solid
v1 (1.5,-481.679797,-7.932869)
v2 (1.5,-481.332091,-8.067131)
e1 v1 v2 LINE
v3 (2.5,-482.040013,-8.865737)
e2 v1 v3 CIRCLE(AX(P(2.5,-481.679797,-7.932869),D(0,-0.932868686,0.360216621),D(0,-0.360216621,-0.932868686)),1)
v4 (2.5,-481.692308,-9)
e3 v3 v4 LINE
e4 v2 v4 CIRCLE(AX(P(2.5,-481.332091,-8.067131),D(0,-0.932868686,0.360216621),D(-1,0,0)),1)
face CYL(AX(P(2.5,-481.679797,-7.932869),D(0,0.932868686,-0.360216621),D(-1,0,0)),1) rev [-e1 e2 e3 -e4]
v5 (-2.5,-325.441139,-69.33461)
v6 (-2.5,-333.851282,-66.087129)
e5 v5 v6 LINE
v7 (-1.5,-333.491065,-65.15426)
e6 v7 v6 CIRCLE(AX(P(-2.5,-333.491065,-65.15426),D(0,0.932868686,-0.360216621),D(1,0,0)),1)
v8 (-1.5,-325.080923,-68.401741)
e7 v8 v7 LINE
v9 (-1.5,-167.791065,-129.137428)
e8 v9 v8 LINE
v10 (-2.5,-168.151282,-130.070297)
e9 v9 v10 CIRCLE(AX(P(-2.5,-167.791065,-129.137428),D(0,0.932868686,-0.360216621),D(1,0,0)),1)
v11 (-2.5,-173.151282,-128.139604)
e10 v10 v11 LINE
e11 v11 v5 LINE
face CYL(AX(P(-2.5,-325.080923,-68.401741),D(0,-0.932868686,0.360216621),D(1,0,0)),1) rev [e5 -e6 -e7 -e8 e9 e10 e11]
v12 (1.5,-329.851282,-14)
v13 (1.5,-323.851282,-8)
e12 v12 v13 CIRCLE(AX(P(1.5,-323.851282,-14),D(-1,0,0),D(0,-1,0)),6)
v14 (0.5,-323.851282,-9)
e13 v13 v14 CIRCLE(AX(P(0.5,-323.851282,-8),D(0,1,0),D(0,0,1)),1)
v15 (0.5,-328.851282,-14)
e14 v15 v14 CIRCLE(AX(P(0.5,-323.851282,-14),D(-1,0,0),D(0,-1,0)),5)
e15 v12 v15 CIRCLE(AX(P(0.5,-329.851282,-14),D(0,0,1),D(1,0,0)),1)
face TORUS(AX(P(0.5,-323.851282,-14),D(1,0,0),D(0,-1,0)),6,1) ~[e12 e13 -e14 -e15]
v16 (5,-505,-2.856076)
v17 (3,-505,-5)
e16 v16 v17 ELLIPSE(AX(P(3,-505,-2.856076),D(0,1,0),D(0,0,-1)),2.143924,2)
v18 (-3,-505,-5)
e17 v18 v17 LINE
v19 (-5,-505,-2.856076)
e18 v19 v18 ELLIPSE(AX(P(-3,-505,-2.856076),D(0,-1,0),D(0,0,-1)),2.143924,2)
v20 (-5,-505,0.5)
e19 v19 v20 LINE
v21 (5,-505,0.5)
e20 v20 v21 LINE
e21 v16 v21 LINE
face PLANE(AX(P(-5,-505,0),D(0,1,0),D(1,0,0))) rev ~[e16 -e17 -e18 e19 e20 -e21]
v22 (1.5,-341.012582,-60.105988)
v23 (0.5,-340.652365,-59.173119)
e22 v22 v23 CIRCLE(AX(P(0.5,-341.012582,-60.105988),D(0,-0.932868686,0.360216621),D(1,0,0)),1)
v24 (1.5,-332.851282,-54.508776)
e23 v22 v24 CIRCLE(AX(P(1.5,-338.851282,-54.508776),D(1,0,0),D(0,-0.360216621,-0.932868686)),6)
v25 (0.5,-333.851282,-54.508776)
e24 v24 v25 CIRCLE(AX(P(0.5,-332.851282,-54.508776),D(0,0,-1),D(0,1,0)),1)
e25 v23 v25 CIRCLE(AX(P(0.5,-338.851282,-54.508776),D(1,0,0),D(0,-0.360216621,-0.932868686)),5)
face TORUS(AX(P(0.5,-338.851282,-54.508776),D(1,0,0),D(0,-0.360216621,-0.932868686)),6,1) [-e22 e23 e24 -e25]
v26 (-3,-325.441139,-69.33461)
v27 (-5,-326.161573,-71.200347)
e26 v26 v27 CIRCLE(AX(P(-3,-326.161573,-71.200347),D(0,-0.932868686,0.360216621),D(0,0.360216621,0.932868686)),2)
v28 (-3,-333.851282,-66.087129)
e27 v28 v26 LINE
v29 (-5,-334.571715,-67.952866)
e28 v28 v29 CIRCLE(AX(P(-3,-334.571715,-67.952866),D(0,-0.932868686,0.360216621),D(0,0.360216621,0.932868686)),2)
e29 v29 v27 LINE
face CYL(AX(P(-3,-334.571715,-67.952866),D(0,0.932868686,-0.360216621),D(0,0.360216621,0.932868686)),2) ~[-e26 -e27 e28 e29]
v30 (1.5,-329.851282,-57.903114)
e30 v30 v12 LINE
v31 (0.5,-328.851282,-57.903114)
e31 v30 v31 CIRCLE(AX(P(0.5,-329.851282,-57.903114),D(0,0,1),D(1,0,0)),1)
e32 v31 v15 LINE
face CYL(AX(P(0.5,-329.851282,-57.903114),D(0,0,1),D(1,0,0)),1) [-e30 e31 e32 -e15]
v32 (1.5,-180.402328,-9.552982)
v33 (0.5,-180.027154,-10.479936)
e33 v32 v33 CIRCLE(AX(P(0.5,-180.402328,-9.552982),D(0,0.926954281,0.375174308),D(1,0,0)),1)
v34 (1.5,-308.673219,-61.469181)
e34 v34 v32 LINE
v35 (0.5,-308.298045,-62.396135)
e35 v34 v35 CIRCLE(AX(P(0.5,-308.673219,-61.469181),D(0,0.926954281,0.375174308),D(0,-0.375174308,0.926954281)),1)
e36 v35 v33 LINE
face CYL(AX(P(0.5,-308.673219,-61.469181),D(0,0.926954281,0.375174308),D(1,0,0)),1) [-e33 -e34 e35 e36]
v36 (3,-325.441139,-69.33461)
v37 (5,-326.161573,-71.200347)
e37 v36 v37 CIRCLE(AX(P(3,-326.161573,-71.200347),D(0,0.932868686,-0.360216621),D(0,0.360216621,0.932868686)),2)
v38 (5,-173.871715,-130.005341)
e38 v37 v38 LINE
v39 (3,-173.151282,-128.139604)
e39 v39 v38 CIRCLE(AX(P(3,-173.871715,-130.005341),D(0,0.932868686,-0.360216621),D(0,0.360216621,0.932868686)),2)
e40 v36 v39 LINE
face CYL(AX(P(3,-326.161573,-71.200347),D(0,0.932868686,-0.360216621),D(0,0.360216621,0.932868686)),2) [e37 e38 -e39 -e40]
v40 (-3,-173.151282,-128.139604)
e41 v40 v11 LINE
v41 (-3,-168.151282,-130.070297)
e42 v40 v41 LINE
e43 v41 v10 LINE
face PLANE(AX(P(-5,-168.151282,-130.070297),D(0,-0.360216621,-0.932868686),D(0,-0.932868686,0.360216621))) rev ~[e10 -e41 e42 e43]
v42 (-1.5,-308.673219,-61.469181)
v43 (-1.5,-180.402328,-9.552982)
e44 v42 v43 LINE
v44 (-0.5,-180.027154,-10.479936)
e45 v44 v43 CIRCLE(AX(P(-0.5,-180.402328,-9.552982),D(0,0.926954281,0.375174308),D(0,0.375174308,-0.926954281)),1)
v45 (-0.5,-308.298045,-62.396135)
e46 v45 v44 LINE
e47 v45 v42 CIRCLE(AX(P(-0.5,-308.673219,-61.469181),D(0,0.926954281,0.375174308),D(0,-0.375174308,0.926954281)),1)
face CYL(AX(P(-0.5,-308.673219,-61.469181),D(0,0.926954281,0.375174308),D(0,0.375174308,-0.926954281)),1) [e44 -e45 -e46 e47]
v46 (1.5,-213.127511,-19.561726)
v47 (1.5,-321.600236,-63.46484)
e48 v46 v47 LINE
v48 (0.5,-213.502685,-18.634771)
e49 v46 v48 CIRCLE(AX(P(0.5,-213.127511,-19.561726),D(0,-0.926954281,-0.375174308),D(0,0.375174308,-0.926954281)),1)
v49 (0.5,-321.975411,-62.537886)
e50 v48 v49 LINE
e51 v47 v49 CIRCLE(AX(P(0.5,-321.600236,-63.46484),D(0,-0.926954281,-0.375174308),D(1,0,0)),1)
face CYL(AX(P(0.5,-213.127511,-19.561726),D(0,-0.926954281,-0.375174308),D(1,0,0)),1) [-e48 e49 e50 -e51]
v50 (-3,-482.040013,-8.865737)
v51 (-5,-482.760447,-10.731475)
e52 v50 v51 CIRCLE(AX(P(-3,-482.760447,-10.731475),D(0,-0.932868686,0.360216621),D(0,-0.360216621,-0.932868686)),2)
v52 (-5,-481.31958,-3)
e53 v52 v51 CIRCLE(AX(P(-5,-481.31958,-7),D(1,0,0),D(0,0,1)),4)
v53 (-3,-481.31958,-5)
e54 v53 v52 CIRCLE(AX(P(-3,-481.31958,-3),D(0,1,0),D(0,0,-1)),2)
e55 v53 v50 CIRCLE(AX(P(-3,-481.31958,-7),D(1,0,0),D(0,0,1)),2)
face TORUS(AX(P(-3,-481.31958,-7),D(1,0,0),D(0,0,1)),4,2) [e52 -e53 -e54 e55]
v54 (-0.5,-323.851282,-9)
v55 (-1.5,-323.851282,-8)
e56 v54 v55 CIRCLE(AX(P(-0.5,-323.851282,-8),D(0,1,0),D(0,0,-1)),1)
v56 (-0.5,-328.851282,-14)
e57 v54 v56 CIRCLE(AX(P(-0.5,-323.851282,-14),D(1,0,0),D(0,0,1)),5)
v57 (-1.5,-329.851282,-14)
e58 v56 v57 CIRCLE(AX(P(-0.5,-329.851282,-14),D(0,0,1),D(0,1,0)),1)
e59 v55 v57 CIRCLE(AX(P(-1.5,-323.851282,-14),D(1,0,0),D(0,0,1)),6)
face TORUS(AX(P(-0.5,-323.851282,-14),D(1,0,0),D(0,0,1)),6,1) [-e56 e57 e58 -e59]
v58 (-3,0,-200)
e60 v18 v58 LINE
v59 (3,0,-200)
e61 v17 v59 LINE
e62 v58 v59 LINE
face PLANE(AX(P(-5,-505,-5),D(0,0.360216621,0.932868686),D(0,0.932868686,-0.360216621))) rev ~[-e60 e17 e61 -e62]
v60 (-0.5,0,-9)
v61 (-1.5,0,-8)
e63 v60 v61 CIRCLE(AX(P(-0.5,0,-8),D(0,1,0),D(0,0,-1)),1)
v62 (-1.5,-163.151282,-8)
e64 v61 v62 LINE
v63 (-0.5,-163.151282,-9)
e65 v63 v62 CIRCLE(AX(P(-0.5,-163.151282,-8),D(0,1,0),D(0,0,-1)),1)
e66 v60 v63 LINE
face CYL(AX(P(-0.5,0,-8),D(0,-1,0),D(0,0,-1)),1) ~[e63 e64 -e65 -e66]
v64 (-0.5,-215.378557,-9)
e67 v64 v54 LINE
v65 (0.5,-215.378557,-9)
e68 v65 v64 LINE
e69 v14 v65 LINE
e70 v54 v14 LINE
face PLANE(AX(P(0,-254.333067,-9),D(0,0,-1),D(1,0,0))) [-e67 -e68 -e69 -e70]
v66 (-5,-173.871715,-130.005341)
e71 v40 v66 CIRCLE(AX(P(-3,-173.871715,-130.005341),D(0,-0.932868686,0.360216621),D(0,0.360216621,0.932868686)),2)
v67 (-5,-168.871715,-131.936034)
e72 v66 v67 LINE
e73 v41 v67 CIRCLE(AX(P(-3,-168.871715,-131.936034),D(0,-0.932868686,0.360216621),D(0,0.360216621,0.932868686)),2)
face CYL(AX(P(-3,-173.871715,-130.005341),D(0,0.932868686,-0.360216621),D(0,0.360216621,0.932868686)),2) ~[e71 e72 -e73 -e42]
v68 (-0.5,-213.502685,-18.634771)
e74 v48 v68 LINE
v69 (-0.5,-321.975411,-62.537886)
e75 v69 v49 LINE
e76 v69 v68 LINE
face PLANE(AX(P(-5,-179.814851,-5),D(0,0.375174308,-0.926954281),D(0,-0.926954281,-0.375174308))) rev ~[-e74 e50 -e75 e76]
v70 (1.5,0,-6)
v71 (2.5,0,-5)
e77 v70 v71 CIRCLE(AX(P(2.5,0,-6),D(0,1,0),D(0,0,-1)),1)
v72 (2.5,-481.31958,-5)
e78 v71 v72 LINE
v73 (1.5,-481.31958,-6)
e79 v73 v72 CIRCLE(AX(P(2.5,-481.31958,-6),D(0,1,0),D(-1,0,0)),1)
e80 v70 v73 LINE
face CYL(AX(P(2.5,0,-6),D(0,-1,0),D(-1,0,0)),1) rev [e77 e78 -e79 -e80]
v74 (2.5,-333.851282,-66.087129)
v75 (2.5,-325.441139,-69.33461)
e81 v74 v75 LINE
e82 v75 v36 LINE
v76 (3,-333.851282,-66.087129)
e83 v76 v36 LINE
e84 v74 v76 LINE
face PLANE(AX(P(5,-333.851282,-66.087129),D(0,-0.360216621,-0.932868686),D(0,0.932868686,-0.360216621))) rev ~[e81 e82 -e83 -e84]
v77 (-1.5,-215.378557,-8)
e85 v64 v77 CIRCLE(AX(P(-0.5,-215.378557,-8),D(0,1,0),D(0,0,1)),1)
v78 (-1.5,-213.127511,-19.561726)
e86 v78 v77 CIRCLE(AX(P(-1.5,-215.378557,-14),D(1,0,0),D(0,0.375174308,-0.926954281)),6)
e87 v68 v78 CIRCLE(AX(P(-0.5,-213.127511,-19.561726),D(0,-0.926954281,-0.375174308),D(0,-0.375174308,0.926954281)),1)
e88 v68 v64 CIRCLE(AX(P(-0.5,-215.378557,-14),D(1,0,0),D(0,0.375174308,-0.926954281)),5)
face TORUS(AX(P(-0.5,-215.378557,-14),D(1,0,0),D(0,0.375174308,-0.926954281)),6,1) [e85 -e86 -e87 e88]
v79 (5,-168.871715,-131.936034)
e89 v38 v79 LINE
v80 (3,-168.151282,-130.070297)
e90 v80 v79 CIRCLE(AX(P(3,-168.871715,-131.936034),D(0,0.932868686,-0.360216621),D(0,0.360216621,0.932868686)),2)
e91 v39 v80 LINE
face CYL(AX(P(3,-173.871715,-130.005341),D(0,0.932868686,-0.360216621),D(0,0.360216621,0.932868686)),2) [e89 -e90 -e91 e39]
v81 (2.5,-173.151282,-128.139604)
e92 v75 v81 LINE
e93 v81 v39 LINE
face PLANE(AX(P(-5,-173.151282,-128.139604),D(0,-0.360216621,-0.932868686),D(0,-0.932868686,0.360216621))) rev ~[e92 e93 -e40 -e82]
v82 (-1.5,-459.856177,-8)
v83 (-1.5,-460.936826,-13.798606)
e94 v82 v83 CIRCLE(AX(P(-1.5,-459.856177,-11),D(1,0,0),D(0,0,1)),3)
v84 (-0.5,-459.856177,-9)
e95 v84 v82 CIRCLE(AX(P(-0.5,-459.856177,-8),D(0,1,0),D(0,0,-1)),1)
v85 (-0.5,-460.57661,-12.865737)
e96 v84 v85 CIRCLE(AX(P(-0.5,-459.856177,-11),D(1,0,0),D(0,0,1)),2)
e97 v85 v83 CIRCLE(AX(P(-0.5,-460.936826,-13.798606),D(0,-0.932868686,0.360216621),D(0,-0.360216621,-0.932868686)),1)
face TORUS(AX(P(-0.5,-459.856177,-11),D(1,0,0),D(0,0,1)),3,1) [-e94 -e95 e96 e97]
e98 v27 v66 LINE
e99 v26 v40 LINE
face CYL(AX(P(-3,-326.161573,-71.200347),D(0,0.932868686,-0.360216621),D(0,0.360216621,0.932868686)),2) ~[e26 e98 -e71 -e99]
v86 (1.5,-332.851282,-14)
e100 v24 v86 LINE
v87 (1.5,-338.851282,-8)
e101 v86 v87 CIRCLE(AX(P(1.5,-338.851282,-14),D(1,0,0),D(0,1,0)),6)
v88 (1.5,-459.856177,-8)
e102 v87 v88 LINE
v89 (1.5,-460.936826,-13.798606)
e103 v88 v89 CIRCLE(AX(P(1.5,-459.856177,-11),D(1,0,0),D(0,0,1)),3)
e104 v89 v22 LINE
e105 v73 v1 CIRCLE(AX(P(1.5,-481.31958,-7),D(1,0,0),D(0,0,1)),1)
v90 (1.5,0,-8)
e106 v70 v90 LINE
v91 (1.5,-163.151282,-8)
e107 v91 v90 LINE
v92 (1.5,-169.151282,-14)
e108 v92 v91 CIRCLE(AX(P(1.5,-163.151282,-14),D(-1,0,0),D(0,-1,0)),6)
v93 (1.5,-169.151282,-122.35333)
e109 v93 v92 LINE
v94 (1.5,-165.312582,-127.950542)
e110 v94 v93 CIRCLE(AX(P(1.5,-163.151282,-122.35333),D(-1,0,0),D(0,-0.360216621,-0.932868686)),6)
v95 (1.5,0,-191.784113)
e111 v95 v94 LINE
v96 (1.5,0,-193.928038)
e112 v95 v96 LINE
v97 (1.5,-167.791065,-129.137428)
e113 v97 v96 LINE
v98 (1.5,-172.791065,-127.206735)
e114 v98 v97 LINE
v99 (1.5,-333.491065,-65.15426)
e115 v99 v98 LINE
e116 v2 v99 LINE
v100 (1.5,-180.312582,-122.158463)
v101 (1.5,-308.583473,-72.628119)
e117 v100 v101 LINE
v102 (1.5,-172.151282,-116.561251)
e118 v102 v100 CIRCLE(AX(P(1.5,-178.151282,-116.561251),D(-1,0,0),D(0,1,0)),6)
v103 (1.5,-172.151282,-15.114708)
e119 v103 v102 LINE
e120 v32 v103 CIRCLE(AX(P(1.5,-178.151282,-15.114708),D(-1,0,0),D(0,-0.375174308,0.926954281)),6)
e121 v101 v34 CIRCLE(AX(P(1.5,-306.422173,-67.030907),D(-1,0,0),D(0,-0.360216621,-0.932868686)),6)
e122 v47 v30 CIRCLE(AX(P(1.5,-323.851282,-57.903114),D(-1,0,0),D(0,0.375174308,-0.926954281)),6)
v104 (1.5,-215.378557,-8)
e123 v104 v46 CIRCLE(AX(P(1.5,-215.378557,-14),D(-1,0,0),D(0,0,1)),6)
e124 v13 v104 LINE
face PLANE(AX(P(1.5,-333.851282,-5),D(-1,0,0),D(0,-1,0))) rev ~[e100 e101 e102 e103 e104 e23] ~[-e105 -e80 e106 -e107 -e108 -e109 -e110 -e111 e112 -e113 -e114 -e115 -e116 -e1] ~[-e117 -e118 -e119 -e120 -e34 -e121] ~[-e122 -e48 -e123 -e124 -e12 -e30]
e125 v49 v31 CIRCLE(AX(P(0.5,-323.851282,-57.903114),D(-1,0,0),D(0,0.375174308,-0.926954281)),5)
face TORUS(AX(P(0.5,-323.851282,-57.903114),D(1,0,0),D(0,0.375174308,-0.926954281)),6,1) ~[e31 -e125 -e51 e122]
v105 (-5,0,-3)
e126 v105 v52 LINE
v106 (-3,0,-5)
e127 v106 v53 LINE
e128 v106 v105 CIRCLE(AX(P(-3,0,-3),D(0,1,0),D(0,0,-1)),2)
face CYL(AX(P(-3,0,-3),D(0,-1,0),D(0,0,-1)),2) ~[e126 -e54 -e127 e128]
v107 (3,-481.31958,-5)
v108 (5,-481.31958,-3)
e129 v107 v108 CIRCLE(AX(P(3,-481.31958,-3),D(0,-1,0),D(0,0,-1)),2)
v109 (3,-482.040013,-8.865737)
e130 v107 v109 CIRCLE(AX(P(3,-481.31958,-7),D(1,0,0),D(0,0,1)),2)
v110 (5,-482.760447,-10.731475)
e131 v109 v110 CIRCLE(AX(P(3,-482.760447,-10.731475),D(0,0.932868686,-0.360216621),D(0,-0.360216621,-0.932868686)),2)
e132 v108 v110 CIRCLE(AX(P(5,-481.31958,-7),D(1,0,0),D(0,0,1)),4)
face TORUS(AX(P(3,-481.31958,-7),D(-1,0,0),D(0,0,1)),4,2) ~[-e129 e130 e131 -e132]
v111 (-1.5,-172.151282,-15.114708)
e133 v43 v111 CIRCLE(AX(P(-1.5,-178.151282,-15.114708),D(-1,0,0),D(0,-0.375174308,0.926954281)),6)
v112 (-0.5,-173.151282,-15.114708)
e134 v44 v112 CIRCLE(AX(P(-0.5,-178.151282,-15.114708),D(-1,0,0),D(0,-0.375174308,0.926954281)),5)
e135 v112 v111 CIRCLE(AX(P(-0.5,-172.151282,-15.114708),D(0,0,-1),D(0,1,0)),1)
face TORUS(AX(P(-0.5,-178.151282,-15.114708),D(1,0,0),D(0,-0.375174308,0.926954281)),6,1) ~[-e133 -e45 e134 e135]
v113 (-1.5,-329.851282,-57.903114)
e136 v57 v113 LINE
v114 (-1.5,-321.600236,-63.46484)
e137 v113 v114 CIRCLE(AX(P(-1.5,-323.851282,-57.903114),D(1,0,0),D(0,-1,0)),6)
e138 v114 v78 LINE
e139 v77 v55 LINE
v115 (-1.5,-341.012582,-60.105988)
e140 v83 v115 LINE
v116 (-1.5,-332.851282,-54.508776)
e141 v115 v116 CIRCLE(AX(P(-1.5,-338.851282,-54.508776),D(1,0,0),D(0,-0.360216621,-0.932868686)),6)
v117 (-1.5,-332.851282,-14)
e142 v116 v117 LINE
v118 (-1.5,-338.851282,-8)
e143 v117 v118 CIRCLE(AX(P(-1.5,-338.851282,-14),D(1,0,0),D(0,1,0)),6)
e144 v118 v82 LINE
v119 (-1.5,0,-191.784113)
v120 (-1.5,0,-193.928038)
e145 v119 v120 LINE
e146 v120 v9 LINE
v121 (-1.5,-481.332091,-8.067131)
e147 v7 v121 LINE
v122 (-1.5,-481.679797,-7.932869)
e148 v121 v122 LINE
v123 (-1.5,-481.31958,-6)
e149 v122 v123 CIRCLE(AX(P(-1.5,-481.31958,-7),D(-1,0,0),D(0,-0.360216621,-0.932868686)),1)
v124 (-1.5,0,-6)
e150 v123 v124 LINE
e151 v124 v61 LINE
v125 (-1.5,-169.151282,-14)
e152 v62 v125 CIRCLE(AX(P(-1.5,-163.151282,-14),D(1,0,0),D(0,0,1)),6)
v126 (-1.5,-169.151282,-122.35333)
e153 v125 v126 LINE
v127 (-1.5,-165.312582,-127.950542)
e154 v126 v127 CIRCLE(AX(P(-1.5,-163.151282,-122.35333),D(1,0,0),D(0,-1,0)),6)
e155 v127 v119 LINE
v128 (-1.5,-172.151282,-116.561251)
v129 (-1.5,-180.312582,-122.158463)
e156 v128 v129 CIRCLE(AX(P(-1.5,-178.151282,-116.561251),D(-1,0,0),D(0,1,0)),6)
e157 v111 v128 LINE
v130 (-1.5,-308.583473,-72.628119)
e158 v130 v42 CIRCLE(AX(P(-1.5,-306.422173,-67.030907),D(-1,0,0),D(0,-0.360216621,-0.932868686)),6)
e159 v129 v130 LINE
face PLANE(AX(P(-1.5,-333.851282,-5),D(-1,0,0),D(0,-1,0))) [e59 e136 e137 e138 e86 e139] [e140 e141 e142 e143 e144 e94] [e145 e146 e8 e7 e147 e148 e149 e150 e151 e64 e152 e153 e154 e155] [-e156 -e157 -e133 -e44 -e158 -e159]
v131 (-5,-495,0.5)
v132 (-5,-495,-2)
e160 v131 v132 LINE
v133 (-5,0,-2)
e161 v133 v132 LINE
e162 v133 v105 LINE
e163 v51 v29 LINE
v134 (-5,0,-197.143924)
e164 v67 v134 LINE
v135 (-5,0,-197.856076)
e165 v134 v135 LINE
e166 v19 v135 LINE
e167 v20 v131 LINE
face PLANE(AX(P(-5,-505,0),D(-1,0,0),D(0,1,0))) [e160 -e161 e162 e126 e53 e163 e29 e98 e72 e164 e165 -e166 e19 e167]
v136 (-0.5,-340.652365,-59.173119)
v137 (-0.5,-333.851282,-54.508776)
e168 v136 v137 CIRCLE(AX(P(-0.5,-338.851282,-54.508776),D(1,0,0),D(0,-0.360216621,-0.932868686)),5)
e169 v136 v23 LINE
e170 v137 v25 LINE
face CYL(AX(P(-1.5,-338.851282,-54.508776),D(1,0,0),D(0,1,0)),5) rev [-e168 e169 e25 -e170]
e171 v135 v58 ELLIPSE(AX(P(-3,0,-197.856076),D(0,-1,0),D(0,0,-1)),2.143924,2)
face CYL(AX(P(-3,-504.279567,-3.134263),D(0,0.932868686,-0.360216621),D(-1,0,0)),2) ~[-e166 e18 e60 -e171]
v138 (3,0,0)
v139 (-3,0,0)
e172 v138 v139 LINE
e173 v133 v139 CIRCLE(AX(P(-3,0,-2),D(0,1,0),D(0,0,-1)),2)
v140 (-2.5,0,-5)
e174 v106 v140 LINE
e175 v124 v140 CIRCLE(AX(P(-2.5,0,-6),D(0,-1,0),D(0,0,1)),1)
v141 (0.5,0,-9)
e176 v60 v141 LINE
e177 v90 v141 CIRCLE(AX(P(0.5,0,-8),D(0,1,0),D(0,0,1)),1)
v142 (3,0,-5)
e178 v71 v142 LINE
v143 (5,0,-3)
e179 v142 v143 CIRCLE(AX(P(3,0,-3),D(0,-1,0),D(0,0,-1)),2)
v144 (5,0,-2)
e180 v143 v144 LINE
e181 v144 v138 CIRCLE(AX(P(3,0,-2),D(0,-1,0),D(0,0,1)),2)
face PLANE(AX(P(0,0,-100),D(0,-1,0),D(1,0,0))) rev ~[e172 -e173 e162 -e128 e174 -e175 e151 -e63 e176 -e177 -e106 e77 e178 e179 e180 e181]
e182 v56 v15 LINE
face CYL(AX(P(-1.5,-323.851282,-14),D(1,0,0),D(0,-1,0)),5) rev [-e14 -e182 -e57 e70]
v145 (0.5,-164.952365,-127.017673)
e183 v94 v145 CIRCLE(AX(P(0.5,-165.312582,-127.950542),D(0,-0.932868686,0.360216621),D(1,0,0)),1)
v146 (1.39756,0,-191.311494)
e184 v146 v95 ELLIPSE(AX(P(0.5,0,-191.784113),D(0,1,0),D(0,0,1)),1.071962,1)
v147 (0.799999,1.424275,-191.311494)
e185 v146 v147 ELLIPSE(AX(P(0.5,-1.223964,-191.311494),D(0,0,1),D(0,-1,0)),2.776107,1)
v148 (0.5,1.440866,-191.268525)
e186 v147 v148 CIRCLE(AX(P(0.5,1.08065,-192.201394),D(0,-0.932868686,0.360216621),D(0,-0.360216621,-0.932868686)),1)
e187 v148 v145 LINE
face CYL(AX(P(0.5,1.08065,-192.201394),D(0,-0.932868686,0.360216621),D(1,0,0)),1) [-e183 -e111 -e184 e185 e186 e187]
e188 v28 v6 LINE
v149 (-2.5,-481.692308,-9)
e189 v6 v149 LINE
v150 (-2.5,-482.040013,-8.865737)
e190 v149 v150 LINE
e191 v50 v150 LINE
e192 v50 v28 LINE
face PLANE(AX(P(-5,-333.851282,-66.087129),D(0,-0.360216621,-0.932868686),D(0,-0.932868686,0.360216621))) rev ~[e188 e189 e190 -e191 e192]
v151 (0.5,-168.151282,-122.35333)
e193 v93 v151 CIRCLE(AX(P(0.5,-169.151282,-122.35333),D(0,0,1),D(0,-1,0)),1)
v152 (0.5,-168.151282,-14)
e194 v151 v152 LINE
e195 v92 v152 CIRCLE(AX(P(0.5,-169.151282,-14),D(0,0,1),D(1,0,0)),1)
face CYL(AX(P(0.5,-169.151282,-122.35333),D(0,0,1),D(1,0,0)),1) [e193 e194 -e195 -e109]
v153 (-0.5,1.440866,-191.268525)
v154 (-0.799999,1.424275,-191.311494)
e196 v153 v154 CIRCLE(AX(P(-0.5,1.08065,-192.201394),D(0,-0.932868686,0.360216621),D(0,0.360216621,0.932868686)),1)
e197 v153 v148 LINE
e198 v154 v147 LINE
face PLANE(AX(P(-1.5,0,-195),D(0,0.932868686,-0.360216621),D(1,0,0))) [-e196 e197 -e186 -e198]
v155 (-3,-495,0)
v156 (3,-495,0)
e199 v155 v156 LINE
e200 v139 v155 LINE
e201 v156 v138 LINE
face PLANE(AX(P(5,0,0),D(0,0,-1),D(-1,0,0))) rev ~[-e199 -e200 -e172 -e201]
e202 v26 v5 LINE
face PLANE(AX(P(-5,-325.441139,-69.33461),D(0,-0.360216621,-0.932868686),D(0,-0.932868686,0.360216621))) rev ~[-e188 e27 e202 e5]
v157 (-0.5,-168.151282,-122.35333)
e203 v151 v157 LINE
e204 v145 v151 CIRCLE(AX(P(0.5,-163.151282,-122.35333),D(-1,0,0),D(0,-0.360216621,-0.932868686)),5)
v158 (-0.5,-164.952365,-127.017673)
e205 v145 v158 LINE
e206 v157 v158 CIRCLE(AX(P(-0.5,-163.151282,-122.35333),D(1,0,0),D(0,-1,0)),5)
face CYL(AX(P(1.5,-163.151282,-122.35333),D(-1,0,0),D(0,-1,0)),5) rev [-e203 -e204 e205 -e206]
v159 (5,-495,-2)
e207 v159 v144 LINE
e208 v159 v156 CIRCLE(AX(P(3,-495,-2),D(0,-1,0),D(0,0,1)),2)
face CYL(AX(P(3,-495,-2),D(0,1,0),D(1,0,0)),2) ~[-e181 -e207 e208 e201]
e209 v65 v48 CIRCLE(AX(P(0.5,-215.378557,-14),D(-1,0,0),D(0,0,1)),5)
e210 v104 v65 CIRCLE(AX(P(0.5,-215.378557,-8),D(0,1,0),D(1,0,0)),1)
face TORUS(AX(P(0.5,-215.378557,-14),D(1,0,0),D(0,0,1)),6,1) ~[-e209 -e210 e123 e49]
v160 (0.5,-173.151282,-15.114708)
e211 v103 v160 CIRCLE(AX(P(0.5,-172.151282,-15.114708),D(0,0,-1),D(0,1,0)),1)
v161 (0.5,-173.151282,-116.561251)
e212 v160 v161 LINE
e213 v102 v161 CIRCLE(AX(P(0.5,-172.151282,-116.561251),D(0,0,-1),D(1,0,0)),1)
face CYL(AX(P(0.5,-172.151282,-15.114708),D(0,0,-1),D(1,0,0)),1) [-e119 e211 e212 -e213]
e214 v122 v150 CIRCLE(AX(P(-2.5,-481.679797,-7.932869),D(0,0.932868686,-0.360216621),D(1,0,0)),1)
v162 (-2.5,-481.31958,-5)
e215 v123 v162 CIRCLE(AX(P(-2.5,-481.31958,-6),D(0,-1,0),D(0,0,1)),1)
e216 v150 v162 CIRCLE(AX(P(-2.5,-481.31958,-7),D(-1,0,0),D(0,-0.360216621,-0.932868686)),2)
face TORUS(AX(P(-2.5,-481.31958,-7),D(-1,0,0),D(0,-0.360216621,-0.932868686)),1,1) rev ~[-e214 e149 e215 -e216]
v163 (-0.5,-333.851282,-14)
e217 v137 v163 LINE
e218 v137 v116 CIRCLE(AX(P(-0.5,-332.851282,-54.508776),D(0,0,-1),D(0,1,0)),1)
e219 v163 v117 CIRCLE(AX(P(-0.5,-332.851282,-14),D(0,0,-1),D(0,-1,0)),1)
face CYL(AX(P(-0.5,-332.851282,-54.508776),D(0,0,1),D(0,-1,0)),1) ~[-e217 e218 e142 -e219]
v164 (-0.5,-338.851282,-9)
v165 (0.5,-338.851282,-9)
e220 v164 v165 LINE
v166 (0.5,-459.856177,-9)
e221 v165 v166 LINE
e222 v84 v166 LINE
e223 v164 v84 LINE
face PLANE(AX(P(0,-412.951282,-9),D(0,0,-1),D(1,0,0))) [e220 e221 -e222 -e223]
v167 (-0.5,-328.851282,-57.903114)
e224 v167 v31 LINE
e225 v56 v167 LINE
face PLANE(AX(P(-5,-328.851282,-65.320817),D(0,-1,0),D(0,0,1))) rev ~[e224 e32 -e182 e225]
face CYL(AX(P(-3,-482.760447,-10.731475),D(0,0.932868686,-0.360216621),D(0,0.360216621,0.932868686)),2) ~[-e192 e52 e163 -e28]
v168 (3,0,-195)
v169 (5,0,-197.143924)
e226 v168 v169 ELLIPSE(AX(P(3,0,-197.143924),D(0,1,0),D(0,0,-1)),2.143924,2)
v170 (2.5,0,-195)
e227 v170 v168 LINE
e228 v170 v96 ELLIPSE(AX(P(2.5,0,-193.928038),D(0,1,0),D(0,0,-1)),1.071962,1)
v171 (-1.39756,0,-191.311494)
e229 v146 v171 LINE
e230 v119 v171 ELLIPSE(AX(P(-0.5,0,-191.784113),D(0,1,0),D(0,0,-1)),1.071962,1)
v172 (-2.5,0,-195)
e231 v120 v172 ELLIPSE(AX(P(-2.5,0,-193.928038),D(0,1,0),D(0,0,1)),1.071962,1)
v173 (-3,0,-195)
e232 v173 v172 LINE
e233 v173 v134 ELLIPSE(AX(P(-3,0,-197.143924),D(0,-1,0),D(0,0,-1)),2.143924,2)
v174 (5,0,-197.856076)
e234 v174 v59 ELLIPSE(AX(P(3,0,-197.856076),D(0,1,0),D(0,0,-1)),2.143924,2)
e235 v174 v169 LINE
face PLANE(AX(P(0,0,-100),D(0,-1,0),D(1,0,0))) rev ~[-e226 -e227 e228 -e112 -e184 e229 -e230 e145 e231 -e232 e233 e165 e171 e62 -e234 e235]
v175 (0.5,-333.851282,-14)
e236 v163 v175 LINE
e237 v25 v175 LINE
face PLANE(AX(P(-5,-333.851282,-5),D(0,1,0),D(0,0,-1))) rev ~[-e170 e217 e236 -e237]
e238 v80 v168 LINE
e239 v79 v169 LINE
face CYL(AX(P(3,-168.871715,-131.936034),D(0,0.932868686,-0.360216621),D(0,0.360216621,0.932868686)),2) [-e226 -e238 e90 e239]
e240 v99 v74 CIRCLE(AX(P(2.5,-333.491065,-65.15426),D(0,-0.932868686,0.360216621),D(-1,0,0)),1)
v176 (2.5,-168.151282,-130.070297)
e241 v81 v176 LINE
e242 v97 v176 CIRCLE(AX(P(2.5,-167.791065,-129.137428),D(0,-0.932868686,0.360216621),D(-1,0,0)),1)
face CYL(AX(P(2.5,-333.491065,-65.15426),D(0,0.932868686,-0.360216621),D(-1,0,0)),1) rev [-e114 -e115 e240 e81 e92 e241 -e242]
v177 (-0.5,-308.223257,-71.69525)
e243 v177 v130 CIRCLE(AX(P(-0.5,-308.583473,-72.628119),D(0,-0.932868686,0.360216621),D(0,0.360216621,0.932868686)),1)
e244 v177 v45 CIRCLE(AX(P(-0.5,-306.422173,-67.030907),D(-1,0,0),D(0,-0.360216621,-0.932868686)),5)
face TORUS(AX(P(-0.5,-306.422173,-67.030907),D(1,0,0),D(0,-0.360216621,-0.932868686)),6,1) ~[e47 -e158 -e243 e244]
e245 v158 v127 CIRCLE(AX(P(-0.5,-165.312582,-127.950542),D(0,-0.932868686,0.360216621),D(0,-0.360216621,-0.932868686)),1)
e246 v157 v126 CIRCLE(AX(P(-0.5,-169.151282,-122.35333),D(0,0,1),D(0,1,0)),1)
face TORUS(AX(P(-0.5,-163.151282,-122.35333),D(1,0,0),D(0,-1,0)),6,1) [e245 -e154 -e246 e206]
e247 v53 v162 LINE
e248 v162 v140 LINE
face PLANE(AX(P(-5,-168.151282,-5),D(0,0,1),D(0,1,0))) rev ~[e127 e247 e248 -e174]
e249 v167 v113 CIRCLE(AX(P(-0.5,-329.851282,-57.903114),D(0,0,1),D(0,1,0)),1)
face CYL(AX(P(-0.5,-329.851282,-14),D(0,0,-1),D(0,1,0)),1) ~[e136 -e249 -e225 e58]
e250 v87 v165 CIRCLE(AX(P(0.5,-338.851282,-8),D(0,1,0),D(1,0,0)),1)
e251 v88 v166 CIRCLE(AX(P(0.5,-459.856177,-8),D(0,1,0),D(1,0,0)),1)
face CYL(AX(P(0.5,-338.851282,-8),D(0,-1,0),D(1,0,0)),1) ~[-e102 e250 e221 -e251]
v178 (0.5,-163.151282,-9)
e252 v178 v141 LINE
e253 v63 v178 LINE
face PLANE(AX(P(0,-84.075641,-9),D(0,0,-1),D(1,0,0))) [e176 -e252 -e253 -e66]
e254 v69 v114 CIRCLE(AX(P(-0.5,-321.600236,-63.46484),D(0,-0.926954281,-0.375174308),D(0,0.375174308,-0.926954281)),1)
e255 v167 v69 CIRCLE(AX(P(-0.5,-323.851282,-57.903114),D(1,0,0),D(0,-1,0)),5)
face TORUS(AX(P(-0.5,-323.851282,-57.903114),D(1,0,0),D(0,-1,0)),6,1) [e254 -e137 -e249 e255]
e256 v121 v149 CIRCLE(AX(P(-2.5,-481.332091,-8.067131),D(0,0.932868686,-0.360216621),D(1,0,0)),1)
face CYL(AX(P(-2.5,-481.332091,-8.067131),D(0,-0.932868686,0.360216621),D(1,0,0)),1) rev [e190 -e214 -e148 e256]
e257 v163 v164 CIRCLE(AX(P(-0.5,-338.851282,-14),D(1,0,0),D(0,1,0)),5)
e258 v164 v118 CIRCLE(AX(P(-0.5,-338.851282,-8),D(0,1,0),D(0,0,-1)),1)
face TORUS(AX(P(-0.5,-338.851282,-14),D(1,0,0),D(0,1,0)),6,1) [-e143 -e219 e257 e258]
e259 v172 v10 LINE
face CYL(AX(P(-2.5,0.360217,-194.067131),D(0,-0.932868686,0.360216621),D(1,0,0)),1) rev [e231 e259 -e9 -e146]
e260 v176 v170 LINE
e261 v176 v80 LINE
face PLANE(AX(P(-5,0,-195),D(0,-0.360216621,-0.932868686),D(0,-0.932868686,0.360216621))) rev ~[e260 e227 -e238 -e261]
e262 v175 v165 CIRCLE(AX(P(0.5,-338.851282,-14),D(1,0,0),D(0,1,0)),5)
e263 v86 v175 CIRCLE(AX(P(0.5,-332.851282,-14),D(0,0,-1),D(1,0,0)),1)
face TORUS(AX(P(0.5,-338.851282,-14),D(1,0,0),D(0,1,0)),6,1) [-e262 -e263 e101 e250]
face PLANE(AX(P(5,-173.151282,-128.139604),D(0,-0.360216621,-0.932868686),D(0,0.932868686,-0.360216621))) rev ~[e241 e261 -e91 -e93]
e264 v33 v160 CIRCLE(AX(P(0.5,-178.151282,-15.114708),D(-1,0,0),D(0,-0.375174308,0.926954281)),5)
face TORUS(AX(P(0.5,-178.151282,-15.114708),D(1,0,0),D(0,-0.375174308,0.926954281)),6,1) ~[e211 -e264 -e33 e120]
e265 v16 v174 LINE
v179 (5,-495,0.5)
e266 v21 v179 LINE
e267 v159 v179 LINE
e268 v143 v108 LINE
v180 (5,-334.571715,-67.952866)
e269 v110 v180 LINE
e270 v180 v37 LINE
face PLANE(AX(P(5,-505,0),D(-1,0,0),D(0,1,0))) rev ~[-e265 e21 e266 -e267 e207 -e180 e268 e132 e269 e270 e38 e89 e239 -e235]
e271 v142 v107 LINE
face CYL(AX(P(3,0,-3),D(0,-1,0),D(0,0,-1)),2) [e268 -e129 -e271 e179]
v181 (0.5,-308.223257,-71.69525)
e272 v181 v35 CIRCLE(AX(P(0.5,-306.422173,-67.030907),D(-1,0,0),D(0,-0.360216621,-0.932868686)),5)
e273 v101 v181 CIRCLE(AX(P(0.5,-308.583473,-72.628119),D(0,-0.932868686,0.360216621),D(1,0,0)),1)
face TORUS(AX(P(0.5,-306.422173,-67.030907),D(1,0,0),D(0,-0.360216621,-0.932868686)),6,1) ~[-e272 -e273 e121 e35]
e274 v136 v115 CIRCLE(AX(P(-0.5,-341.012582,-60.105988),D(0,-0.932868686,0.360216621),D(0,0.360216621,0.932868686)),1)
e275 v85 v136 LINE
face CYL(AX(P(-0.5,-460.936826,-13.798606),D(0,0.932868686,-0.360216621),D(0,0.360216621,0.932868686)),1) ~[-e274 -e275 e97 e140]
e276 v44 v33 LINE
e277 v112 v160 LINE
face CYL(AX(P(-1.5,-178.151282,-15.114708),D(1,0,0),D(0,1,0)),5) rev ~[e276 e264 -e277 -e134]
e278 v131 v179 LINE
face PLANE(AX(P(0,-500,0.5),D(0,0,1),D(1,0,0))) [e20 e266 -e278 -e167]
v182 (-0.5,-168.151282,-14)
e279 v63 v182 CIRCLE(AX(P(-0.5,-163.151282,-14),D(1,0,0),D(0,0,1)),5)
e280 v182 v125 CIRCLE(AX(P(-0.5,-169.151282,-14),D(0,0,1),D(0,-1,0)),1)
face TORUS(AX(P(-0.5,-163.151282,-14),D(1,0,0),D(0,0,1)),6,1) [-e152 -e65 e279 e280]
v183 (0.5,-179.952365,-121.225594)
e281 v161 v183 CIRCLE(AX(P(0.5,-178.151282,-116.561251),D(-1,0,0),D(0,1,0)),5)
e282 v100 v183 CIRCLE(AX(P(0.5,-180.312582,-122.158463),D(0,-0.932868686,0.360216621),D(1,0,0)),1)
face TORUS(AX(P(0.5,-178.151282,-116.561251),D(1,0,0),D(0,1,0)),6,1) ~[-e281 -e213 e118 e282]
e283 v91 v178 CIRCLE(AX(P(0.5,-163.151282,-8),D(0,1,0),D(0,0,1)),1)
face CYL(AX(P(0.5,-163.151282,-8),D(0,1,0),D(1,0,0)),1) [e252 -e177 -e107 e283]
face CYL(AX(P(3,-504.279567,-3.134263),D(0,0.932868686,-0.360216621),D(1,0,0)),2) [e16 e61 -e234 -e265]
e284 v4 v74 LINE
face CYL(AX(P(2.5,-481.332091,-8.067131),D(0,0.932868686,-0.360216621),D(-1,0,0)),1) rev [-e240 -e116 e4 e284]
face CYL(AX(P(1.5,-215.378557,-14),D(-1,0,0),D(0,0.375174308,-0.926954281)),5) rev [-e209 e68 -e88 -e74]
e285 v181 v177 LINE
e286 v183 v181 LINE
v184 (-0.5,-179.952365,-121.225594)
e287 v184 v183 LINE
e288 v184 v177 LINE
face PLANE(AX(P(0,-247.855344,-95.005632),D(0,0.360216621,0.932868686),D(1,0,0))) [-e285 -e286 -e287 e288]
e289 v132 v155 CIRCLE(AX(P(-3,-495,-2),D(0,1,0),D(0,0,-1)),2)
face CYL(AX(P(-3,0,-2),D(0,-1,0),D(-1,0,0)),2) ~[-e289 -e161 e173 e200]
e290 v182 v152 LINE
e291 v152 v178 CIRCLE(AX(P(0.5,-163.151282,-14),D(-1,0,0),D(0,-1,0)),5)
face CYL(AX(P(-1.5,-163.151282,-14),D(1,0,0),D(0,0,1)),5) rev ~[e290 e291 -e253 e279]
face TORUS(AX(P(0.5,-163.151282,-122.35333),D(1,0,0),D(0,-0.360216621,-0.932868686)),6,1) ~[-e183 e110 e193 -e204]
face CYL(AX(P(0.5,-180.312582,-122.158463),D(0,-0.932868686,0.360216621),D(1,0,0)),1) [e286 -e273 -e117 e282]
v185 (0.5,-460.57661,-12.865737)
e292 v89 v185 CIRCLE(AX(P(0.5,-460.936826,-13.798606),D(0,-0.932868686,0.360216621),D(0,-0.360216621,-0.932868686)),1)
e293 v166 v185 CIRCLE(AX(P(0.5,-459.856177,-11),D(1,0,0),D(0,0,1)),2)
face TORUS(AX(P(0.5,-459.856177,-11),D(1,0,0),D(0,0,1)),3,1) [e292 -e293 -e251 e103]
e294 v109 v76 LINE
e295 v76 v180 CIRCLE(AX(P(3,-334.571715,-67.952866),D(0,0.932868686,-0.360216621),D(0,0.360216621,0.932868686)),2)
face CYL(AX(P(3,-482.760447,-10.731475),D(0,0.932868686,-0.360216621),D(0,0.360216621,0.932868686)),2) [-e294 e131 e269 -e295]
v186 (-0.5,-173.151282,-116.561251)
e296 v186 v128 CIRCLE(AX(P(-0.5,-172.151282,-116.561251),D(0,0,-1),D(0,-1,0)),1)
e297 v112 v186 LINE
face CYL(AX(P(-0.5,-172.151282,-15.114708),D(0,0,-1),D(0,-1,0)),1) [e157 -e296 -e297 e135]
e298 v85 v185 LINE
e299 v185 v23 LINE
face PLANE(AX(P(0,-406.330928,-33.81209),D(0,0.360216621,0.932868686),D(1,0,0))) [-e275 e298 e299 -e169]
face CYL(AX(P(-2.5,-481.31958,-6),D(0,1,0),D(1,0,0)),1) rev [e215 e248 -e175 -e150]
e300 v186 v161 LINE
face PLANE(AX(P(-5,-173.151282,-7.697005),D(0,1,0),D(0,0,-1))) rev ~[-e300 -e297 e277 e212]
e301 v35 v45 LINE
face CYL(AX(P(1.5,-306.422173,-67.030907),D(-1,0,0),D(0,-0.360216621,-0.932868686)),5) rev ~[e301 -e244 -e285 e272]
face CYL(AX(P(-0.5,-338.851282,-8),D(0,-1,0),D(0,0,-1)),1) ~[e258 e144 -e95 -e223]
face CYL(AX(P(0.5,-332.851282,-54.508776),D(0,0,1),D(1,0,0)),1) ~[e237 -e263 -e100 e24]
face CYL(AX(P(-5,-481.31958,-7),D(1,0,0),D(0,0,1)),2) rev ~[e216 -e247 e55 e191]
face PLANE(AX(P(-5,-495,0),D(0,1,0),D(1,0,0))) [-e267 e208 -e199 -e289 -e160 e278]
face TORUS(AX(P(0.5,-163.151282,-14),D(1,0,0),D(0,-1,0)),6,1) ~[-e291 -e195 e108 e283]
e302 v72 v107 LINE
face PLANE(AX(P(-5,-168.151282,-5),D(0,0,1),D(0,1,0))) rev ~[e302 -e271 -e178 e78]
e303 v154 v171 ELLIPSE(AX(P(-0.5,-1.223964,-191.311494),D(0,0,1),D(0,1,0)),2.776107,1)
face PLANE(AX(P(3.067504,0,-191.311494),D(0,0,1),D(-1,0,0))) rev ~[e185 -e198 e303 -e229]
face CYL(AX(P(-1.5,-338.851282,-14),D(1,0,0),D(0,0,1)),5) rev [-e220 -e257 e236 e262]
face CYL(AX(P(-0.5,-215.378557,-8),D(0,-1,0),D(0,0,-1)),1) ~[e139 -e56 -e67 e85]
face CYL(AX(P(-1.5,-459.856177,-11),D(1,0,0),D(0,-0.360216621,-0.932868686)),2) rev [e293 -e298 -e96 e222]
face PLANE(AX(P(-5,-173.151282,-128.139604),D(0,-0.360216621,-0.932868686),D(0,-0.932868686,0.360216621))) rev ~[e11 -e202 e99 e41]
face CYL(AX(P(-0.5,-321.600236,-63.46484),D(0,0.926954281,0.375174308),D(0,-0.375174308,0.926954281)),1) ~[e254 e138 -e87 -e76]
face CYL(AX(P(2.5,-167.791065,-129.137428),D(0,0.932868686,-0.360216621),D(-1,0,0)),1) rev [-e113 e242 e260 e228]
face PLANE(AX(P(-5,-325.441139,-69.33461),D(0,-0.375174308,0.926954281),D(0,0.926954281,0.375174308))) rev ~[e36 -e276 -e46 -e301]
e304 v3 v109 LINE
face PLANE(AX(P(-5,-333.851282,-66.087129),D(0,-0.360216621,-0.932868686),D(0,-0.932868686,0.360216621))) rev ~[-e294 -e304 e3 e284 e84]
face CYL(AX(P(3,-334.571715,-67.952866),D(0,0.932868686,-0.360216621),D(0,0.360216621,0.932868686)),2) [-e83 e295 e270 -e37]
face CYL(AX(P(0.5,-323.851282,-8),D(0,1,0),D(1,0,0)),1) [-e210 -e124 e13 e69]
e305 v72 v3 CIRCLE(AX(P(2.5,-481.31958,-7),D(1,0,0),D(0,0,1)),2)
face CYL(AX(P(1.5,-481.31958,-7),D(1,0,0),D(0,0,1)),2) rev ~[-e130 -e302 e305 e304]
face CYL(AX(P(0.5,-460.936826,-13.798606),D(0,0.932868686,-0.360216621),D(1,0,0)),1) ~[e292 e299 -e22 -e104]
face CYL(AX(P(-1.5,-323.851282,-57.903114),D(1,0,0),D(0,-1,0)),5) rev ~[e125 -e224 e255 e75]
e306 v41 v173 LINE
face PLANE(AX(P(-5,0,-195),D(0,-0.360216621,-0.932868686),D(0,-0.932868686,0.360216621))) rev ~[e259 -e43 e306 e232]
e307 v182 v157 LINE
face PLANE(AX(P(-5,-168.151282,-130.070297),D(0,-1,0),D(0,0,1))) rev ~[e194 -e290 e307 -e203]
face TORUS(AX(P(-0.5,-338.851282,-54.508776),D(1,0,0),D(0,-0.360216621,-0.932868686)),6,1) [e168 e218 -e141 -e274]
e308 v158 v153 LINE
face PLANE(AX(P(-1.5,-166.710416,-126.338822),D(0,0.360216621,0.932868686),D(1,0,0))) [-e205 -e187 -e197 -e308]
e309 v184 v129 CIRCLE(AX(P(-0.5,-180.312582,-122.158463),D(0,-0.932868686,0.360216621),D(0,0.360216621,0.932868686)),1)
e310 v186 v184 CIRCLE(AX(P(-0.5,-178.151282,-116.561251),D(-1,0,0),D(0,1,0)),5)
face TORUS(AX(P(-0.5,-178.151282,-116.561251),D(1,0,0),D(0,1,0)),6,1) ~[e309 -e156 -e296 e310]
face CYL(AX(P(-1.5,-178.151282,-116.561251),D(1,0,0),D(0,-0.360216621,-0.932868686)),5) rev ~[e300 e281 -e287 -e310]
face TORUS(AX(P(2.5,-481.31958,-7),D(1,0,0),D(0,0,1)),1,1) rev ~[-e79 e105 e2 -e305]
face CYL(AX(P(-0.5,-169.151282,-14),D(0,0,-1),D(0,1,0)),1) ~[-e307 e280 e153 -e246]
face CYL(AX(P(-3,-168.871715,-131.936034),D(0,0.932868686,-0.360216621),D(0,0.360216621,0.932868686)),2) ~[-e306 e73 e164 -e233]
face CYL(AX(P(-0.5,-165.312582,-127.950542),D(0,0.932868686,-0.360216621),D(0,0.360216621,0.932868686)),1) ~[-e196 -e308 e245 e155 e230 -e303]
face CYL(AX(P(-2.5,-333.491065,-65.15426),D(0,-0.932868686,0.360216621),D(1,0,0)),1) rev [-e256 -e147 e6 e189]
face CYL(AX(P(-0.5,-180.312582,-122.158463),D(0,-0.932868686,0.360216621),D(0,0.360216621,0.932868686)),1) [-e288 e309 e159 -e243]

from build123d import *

# Parameters (mm, degrees)
F1_DEPTH  = 505
F2_DEPTH  = 500.5
F4_DEPTH  = 10
F5_DEPTH  = 10
F7_DEPTH  = 3.5
F8_W      = 10
F8_H      = 10
F10_DEPTH = 0.5
F11_DEPTH = 3.5
F12_W     = 3
F12_H     = 158.2
F12_H_2   = 149.0364306936
F12_H_3   = 168.1512820513
F13_DEPTH = 4
F14_W     = 3
F14_H     = 180.2518238002
F14_H_2   = 163.2489754916
F14_H_3   = 158.4799959846
F15_DEPTH = 4
F16_DEPTH = 40
F17_R     = 2
F18_R     = 5
F19_R     = 1
F20_R     = 2
F22_W     = 5.5675039161
F22_H     = 3.688506484
F23_DEPTH = 25


# Not quite as in the source:
# - two fillets or chamfers of one size are made in one step


with BuildPart() as f1:
    # F0 (on Front) → F1 (new body)
    with BuildSketch(Plane.XZ):
        Polygon((5, 0), (0, 0), (-5, 0), (-5, -200), (5, -200), align=None)
    extrude(amount=F1_DEPTH)

    # F0 (on Front) → F2 (join)
    with BuildSketch(Plane.XZ):
        Polygon((5, 0), (0, 0), (-5, 0), (-5, -200), (5, -200), align=None)
    extrude(amount=F2_DEPTH)

    # F3 (on face) → F4 (cut, through all)
    with BuildSketch(Plane(origin=(-5, 0, 0), x_dir=(0, -1, 0), z_dir=(-1, 0, 0))):
        Polygon((328.8512820513, -65.3208171387), (328.8512820513, -5), (179.8148513577, -5), align=None)
        Polygon((173.1512820513, -128.1396039604), (325.4411393395, -69.334609562), (173.1512820513, -7.6970046434), align=None)
        Polygon((168.1512820513, -5), (0, -5), (0, -195), (168.1512820513, -130.0702970297), align=None)
        Polygon((333.8512820513, -66.0871287129), (492.0512820513, -5), (333.8512820513, -5), align=None)
    extrude(amount=-F4_DEPTH, mode=Mode.SUBTRACT)

    # F3 (on face) → F5 (cut, through all)
    with BuildSketch(Plane(origin=(-5, 0, 0), x_dir=(0, -1, 0), z_dir=(-1, 0, 0))):
        Polygon((505, -200), (505, -5), (331.3512820513, -72.0524752475), (0, -200), align=None)
    extrude(amount=-F5_DEPTH, mode=Mode.SUBTRACT)

    # F6 (on face) → F7 (cut)
    with BuildSketch(Plane(origin=(-5, 0, 0), x_dir=(0, -1, 0), z_dir=(-1, 0, 0))):
        Polygon((179.8148513577, -5), (168.1512820513, -5), (168.1512820513, -130.0702970297), (173.1512820513, -128.1396039604), (173.1512820513, -7.6970046434), (325.4411393395, -69.334609562), (333.8512820513, -66.0871287129), (333.8512820513, -5), (328.8512820513, -5), (328.8512820513, -65.3208171387), align=None)
    extrude(amount=-F7_DEPTH, mode=Mode.SUBTRACT)

    # F8 (on face) → F10 (join)
    with BuildSketch(Plane.XY):
        with Locations((0, -500)):
            Rectangle(F8_W, F8_H)
    extrude(amount=F10_DEPTH)

    # F9 (on face) → F11 (cut)
    with BuildSketch(Plane.YZ.offset(5)):
        Polygon((-173.1512820513, -7.6970046434), (-173.1512820513, -128.1396039604), (-168.1512820513, -130.0702970297), (-168.1512820513, -5), (-179.8148513577, -5), (-328.8512820513, -65.3208171387), (-328.8512820513, -5), (-333.8512820513, -5), (-333.8512820513, -66.0871287129), (-325.4411393395, -69.334609562), align=None)
    extrude(amount=-F11_DEPTH, mode=Mode.SUBTRACT)

    # F12 (on face) → F13 (join)
    with BuildSketch(Plane(origin=(0, 0, -5), x_dir=(1, 0, 0), z_dir=(0, 0, -1))):
        with Locations((0, 412.9512820513)):
            Rectangle(F12_W, F12_H)
        with Locations((0, 254.3330667045)):
            Rectangle(F12_W, F12_H_2)
        with Locations((0, 84.0756410256)):
            Rectangle(F12_W, F12_H_3)
    extrude(amount=F13_DEPTH)

    # F14 (on face) → F15 (join)
    with BuildSketch(Plane(origin=(0, -65.5267872377, -169.6975772053), x_dir=(1, 0, 0), z_dir=(0, 0.3602166214, 0.9328686862))):
        with Locations((0, -19.8836707273)):
            Rectangle(F14_W, F14_H)
        with Locations((0, -196.9938815385)):
            Rectangle(F14_W, F14_H_2)
        with Locations((0, -366.8737226384)):
            Rectangle(F14_W, F14_H_3)
    extrude(amount=F15_DEPTH)

    # F16 (add): a face of the model
    f16_faces = [f1.faces().sort_by_distance(p)[0] for p in [
        (0, -167.4308488085, -128.2045596573),
    ]]
    extrude(f16_faces, amount=F16_DEPTH)

    # F17
    f17_edges = [f1.edges().sort_by_distance(p)[0] for p in [
        (0, -470.587878, -9),
        (-3.25, -492.051282, -5),
        (3.25, -492.051282, -5),
    ]]
    fillet(f17_edges, radius=F17_R)

    # F18
    f18_edges = [f1.edges().sort_by_distance(p)[0] for p in [
        (0, -333.851282, -9),
        (0, -328.851282, -9),
        (0, -328.851282, -65.320817),
        (0, -333.851282, -61.79928),
        (0, -189.69777, -9),
        (0, -173.151282, -7.697005),
        (0, -168.151282, -9),
        (0, -173.151282, -123.851755),
        (0, -320.019504, -67.140264),
        (0, -168.151282, -125.782448),
    ]]
    fillet(f18_edges, radius=F18_R)

    # F19
    f19_edges = [f1.edges().sort_by_distance(p)[0] for p in [
        (-1.5, -241.020007, -101.932869),
        (1.5, -240.65979, -5),
        (-1.5, -240.65979, -5),
        (-1.5, -483.285728, -6.633581),
        (1.5, -81.755749, -159.143099),
        (1.5, -167.274716, -125.181278),
        (1.5, -168.151282, -68.176665),
        (1.5, -241.020007, -101.932869),
        (1.5, -166.686816, -10.464466),
        (1.5, -483.285728, -6.633581),
        (1.5, -81.575641, -9),
        (1.5, -244.087811, -96.460422),
        (1.5, -175.323334, -120.684685),
        (1.5, -311.422012, -67.071118),
        (1.5, -173.151282, -65.837979),
        (1.5, -244.162599, -36.438036),
        (1.5, -175.356587, -10.968664),
        (1.5, -328.851282, -35.951557),
        (1.5, -326.645977, -62.049158),
        (1.5, -327.386816, -10.464466),
        (1.5, -267.739048, -40.586328),
        (1.5, -269.614919, -9),
        (1.5, -210.470713, -13.044452),
        (1.5, -399.353729, -9),
        (1.5, -335.315748, -10.464466),
        (1.5, -461.822324, -10.633581),
        (1.5, -333.851282, -34.254388),
        (1.5, -400.614487, -36.019428),
        (1.5, -336.023334, -58.63221),
        (-1.5, -81.755749, -159.143099),
        (-1.5, -167.274716, -125.181278),
        (-1.5, -168.151282, -68.176665),
        (-1.5, -166.686816, -10.464466),
        (-1.5, -81.575641, -9),
        (-1.5, -244.087811, -96.460422),
        (-1.5, -175.323334, -120.684685),
        (-1.5, -311.422012, -67.071118),
        (-1.5, -173.151282, -65.837979),
        (-1.5, -244.162599, -36.438036),
        (-1.5, -175.356587, -10.968664),
        (-1.5, -328.851282, -35.951557),
        (-1.5, -326.645977, -62.049158),
        (-1.5, -327.386816, -10.464466),
        (-1.5, -267.739048, -40.586328),
        (-1.5, -269.614919, -9),
        (-1.5, -210.470713, -13.044452),
        (-1.5, -399.353729, -9),
        (-1.5, -335.315748, -10.464466),
        (-1.5, -461.822324, -10.633581),
        (-1.5, -333.851282, -34.254388),
        (-1.5, -400.614487, -36.019428),
        (-1.5, -336.023334, -58.63221),
    ]]
    fillet(f19_edges, radius=F19_R)

    # F20
    f20_edges = [f1.edges().sort_by_distance(p)[0] for p in [
        (-5, -240.65979, -5),
        (-5, -247.5, 0),
        (5, -247.5, 0),
        (5, -240.65979, -5),
        (5, -252.5, -102.5),
        (-5, -252.5, -102.5),
        (5, -241.020007, -101.932869),
        (5, -483.285728, -6.633581),
        (-5, -241.020007, -101.932869),
        (-5, -483.285728, -6.633581),
    ]]
    fillet(f20_edges, radius=F20_R)

    # F22 (on face) → F23 (cut)
    with BuildSketch(Plane(origin=(0, 0, 0), x_dir=(-1, 0, 0), z_dir=(0, 1, 0))):
        with Locations((-0.283751958, -193.155746758)):
            Rectangle(F22_W, F22_H)
    extrude(amount=F23_DEPTH, mode=Mode.SUBTRACT)


solid = f1.part
